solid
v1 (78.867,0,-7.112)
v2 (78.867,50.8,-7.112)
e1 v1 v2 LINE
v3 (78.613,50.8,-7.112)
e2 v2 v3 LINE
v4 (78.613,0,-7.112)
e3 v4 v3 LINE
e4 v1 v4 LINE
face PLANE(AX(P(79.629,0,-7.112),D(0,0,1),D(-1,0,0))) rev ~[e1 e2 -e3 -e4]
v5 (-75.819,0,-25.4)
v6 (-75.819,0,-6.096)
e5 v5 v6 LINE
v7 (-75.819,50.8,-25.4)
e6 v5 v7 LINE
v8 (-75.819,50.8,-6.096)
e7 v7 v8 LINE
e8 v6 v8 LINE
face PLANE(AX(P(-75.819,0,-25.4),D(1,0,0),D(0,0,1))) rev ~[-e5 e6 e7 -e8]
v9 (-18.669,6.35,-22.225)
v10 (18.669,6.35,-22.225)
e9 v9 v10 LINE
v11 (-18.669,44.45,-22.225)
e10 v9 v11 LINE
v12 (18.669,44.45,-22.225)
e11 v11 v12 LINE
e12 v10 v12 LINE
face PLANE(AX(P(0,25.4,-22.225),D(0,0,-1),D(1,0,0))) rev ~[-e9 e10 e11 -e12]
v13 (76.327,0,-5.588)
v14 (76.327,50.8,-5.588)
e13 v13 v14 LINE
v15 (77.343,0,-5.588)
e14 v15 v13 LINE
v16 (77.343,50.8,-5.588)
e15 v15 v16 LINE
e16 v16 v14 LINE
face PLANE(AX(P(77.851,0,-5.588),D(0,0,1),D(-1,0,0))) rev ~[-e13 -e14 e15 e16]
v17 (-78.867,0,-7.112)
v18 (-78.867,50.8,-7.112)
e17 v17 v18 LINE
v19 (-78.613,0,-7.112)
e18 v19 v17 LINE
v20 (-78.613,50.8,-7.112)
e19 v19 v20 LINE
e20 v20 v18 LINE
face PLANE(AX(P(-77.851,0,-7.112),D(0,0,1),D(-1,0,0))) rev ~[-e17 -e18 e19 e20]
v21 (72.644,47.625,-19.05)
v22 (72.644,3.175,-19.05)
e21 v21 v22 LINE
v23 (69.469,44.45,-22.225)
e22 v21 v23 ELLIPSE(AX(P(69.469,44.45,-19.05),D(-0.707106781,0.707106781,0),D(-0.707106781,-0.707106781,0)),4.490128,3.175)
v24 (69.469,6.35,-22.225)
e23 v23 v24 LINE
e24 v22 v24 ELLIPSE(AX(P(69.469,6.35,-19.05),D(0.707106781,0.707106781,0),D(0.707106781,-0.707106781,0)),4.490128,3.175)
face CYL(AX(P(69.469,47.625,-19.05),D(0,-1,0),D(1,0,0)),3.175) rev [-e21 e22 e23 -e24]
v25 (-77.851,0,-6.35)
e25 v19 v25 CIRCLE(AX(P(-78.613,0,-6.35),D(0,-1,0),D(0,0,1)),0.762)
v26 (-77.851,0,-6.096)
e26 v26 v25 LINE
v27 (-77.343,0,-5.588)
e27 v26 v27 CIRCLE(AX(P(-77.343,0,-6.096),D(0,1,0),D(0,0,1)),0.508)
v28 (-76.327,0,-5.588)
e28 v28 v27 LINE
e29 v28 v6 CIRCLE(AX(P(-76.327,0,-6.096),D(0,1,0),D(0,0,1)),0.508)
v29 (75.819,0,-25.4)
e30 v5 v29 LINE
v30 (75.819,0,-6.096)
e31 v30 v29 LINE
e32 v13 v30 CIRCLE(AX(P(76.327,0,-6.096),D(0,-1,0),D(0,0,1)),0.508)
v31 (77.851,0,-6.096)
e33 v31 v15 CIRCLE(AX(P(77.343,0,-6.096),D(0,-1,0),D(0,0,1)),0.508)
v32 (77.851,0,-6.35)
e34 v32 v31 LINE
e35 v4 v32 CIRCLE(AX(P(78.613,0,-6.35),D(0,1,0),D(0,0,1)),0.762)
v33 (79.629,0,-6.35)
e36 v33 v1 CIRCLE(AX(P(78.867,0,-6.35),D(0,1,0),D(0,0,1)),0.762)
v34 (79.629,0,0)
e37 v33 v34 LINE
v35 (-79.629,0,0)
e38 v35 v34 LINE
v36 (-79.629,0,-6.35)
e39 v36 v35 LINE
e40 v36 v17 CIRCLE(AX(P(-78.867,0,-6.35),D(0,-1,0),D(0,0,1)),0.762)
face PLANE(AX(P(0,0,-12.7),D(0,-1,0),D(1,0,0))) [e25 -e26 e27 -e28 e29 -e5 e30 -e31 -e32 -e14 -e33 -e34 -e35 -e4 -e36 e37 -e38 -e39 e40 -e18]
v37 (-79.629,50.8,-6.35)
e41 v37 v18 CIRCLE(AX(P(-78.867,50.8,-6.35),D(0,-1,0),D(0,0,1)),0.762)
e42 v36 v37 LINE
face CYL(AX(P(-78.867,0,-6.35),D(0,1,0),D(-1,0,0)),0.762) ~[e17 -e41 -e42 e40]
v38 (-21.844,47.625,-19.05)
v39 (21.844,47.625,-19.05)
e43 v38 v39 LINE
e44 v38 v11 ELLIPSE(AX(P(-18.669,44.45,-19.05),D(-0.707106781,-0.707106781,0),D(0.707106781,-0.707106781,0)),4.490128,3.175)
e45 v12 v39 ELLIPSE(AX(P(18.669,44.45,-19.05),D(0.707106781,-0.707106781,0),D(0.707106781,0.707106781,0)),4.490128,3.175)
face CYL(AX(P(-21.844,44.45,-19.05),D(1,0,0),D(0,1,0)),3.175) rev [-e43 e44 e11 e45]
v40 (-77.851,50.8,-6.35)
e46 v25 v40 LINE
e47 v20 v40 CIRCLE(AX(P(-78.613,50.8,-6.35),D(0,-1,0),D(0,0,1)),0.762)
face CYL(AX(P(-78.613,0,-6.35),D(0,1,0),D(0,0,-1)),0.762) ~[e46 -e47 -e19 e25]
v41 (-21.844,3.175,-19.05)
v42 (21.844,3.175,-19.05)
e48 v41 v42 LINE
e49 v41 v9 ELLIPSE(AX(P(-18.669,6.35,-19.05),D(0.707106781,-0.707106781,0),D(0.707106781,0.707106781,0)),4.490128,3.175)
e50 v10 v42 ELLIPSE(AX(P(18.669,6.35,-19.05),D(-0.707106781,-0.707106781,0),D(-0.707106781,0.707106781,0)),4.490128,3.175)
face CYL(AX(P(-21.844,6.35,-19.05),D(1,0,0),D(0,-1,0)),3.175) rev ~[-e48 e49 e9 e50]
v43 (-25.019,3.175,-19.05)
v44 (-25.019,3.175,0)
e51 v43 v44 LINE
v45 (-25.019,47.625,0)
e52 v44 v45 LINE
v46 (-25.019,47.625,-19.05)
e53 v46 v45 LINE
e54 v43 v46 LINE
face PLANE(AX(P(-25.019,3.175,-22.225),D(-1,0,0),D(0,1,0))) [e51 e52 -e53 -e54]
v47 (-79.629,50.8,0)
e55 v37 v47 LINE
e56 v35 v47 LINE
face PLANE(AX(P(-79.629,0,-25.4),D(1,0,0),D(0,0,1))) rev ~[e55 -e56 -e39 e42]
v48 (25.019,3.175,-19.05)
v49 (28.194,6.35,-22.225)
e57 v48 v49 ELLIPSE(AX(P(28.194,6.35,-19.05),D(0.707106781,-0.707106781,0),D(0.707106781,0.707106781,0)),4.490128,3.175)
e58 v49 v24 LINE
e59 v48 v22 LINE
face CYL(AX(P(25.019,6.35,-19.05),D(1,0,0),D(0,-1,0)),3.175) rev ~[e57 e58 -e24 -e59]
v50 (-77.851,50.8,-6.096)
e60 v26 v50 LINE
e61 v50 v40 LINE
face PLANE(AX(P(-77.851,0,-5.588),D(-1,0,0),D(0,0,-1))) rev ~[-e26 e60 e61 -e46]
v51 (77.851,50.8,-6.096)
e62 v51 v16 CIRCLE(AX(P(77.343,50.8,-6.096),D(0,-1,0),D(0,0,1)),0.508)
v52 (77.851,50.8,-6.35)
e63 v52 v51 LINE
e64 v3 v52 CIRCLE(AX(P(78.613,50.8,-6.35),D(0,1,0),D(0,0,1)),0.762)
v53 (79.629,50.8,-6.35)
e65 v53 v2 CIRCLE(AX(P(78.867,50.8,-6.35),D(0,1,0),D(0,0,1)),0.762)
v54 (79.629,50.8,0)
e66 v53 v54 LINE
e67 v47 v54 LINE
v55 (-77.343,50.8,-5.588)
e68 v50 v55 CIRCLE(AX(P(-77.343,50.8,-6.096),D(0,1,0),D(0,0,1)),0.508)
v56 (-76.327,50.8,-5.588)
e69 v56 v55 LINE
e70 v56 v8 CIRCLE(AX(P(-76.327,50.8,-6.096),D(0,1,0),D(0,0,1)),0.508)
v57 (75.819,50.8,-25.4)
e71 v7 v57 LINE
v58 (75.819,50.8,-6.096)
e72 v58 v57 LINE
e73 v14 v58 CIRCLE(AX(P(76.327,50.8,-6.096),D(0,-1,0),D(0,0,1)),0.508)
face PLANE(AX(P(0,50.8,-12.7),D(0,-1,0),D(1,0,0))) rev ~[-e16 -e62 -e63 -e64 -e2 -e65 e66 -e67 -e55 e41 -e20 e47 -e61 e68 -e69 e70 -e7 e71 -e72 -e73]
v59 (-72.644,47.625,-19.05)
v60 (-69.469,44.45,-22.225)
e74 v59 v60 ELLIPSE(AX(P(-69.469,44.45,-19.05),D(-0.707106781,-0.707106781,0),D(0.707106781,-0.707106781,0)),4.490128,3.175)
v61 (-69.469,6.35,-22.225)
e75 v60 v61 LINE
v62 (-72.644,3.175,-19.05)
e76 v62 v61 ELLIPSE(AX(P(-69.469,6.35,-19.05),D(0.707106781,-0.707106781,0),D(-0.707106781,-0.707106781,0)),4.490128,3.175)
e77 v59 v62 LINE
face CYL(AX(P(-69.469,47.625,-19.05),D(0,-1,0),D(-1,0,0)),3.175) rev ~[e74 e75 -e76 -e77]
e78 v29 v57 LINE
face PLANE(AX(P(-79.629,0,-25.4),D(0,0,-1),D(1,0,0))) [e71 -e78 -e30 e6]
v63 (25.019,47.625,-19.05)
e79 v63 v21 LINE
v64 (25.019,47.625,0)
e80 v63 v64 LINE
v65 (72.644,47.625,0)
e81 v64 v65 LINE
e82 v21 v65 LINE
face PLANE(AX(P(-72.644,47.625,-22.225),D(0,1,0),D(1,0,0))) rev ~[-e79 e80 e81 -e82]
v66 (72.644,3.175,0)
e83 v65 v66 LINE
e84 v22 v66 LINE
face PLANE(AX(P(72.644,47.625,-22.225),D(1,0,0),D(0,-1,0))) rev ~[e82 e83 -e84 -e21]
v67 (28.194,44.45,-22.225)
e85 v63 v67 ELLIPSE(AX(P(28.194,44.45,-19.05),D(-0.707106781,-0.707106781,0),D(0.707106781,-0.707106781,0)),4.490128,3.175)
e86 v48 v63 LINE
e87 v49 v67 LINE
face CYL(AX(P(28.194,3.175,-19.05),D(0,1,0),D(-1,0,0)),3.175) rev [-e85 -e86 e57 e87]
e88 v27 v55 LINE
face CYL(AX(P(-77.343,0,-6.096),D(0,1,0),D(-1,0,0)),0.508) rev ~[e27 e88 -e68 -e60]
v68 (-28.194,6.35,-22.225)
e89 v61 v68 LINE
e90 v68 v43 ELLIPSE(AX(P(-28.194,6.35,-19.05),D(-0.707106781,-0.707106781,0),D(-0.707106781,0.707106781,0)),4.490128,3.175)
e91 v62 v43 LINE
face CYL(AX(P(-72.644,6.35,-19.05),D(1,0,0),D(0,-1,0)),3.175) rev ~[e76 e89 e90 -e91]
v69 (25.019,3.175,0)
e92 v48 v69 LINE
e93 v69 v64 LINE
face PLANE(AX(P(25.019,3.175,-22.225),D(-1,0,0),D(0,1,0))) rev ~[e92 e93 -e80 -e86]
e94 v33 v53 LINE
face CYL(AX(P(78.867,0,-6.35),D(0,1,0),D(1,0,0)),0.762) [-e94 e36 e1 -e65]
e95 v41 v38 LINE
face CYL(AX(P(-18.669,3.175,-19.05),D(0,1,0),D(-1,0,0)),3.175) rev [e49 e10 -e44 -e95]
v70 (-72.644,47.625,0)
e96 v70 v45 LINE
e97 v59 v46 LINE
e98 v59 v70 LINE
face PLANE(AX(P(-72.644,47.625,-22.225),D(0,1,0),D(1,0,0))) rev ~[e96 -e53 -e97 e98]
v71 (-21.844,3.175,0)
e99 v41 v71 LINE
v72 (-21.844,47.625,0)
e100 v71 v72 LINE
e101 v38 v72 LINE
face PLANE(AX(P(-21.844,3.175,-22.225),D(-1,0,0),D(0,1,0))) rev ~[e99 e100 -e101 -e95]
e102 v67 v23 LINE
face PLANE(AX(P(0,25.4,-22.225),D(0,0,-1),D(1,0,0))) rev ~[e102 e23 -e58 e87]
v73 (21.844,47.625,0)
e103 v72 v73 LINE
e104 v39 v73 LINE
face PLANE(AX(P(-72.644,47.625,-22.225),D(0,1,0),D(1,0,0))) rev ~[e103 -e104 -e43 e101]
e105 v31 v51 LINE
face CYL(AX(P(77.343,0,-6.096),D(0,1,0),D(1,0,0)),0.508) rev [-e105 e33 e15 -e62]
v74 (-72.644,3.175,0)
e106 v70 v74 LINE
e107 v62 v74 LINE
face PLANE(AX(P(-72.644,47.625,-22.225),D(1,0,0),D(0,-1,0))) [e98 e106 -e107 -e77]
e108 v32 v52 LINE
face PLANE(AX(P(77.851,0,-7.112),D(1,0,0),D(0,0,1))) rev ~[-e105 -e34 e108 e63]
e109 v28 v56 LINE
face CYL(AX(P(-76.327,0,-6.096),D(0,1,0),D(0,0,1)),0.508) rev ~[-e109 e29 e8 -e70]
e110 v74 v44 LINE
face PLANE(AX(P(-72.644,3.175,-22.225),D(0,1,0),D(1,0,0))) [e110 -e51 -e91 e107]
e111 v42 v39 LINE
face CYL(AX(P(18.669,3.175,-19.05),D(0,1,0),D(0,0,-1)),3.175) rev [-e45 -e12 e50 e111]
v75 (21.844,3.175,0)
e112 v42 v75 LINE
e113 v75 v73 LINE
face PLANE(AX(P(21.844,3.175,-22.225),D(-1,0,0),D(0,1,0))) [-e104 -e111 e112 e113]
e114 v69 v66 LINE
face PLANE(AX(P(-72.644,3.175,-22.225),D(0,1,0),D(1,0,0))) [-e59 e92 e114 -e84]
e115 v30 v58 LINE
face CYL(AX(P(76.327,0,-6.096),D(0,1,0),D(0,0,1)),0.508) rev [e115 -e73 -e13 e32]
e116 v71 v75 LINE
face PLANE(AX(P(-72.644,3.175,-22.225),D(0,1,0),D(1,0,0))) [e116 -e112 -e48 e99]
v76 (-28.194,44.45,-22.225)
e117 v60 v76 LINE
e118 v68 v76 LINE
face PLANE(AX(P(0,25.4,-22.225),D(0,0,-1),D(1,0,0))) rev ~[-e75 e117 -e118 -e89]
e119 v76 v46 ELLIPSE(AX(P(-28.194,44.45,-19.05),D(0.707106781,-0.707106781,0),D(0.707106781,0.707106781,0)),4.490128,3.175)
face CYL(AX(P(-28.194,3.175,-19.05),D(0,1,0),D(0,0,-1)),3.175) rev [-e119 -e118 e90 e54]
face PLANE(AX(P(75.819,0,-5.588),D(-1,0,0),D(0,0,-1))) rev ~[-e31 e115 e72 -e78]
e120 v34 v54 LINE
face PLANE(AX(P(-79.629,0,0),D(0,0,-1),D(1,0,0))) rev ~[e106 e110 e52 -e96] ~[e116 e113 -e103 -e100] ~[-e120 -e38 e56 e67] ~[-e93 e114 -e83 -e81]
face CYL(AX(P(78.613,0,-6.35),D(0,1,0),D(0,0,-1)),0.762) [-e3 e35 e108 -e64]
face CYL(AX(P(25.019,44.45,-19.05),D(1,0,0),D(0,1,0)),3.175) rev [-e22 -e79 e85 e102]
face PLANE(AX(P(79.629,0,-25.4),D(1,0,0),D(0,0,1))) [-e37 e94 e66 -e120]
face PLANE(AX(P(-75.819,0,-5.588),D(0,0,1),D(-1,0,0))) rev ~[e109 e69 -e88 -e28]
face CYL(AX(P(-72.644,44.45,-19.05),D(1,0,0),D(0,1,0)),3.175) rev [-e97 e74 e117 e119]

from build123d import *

# Parameters (mm, degrees)
F0_W      = 159.258
F0_H      = 25.4
F1_DEPTH  = 50.8
F3_DEPTH  = 50.801
F4_R      = 0.762
F5_R      = 0.508
F7_W      = 145.288
F7_H      = 44.45
F8_DEPTH  = 22.226
F9_W      = 3.175
F9_H      = 44.45
F10_DEPTH = 22.225
F11_R     = 3.175


with BuildPart() as f1:
    # F0 (on Front) → F1 (new body)
    with BuildSketch(Plane.XZ):
        with Locations((0, -12.7)):
            Rectangle(F0_W, F0_H)
    extrude(amount=-F1_DEPTH)

    # F2 (on face) → F3 (cut, through all)
    with BuildSketch(Plane.XZ):
        Polygon((-77.851, -7.112), (-79.629, -7.112), (-79.629, -25.4), (-75.819, -25.4), (-75.819, -5.588), (-77.851, -5.588), align=None)
        Polygon((77.851, -5.588), (75.819, -5.588), (75.819, -25.4), (79.629, -25.4), (79.629, -7.112), (77.851, -7.112), align=None)
    extrude(amount=-F3_DEPTH, mode=Mode.SUBTRACT)

    # F4
    f4_edges = [f1.edges().sort_by_distance(p)[0] for p in [
        (-79.629, 25.4, -7.112),
        (-77.851, 25.4, -7.112),
        (77.851, 25.4, -7.112),
        (79.629, 25.4, -7.112),
    ]]
    fillet(f4_edges, radius=F4_R)

    # F5
    f5_edges = [f1.edges().sort_by_distance(p)[0] for p in [
        (-77.851, 25.4, -5.588),
        (-75.819, 25.4, -5.588),
        (77.851, 25.4, -5.588),
        (75.819, 25.4, -5.588),
    ]]
    fillet(f5_edges, radius=F5_R)

    # F7 (on offset) → F8 (cut, through all)
    with BuildSketch(Plane(origin=(0, 0, -22.225), x_dir=(1, 0, 0), z_dir=(0, 0, -1))):
        with Locations((0, -25.4)):
            Rectangle(F7_W, F7_H)
    extrude(amount=-F8_DEPTH, mode=Mode.SUBTRACT)

    # F9 (on face) → F10 (join, through all)
    with BuildSketch(Plane.XY.offset(-22.225)):
        with Locations((-23.4315, 25.4)):
            Rectangle(F9_W, F9_H)
        with Locations((23.4315, 25.4)):
            Rectangle(F9_W, F9_H)
    extrude(amount=F10_DEPTH)

    # F11
    f11_edges = [f1.edges().sort_by_distance(p)[0] for p in [
        (-25.019, 25.4, -22.225),
        (-48.8315, 47.625, -22.225),
        (-72.644, 25.4, -22.225),
        (-48.8315, 3.175, -22.225),
        (21.844, 25.4, -22.225),
        (0, 47.625, -22.225),
        (-21.844, 25.4, -22.225),
        (0, 3.175, -22.225),
        (72.644, 25.4, -22.225),
        (48.8315, 47.625, -22.225),
        (25.019, 25.4, -22.225),
        (48.8315, 3.175, -22.225),
    ]]
    fillet(f11_edges, radius=F11_R)


solid = f1.part
